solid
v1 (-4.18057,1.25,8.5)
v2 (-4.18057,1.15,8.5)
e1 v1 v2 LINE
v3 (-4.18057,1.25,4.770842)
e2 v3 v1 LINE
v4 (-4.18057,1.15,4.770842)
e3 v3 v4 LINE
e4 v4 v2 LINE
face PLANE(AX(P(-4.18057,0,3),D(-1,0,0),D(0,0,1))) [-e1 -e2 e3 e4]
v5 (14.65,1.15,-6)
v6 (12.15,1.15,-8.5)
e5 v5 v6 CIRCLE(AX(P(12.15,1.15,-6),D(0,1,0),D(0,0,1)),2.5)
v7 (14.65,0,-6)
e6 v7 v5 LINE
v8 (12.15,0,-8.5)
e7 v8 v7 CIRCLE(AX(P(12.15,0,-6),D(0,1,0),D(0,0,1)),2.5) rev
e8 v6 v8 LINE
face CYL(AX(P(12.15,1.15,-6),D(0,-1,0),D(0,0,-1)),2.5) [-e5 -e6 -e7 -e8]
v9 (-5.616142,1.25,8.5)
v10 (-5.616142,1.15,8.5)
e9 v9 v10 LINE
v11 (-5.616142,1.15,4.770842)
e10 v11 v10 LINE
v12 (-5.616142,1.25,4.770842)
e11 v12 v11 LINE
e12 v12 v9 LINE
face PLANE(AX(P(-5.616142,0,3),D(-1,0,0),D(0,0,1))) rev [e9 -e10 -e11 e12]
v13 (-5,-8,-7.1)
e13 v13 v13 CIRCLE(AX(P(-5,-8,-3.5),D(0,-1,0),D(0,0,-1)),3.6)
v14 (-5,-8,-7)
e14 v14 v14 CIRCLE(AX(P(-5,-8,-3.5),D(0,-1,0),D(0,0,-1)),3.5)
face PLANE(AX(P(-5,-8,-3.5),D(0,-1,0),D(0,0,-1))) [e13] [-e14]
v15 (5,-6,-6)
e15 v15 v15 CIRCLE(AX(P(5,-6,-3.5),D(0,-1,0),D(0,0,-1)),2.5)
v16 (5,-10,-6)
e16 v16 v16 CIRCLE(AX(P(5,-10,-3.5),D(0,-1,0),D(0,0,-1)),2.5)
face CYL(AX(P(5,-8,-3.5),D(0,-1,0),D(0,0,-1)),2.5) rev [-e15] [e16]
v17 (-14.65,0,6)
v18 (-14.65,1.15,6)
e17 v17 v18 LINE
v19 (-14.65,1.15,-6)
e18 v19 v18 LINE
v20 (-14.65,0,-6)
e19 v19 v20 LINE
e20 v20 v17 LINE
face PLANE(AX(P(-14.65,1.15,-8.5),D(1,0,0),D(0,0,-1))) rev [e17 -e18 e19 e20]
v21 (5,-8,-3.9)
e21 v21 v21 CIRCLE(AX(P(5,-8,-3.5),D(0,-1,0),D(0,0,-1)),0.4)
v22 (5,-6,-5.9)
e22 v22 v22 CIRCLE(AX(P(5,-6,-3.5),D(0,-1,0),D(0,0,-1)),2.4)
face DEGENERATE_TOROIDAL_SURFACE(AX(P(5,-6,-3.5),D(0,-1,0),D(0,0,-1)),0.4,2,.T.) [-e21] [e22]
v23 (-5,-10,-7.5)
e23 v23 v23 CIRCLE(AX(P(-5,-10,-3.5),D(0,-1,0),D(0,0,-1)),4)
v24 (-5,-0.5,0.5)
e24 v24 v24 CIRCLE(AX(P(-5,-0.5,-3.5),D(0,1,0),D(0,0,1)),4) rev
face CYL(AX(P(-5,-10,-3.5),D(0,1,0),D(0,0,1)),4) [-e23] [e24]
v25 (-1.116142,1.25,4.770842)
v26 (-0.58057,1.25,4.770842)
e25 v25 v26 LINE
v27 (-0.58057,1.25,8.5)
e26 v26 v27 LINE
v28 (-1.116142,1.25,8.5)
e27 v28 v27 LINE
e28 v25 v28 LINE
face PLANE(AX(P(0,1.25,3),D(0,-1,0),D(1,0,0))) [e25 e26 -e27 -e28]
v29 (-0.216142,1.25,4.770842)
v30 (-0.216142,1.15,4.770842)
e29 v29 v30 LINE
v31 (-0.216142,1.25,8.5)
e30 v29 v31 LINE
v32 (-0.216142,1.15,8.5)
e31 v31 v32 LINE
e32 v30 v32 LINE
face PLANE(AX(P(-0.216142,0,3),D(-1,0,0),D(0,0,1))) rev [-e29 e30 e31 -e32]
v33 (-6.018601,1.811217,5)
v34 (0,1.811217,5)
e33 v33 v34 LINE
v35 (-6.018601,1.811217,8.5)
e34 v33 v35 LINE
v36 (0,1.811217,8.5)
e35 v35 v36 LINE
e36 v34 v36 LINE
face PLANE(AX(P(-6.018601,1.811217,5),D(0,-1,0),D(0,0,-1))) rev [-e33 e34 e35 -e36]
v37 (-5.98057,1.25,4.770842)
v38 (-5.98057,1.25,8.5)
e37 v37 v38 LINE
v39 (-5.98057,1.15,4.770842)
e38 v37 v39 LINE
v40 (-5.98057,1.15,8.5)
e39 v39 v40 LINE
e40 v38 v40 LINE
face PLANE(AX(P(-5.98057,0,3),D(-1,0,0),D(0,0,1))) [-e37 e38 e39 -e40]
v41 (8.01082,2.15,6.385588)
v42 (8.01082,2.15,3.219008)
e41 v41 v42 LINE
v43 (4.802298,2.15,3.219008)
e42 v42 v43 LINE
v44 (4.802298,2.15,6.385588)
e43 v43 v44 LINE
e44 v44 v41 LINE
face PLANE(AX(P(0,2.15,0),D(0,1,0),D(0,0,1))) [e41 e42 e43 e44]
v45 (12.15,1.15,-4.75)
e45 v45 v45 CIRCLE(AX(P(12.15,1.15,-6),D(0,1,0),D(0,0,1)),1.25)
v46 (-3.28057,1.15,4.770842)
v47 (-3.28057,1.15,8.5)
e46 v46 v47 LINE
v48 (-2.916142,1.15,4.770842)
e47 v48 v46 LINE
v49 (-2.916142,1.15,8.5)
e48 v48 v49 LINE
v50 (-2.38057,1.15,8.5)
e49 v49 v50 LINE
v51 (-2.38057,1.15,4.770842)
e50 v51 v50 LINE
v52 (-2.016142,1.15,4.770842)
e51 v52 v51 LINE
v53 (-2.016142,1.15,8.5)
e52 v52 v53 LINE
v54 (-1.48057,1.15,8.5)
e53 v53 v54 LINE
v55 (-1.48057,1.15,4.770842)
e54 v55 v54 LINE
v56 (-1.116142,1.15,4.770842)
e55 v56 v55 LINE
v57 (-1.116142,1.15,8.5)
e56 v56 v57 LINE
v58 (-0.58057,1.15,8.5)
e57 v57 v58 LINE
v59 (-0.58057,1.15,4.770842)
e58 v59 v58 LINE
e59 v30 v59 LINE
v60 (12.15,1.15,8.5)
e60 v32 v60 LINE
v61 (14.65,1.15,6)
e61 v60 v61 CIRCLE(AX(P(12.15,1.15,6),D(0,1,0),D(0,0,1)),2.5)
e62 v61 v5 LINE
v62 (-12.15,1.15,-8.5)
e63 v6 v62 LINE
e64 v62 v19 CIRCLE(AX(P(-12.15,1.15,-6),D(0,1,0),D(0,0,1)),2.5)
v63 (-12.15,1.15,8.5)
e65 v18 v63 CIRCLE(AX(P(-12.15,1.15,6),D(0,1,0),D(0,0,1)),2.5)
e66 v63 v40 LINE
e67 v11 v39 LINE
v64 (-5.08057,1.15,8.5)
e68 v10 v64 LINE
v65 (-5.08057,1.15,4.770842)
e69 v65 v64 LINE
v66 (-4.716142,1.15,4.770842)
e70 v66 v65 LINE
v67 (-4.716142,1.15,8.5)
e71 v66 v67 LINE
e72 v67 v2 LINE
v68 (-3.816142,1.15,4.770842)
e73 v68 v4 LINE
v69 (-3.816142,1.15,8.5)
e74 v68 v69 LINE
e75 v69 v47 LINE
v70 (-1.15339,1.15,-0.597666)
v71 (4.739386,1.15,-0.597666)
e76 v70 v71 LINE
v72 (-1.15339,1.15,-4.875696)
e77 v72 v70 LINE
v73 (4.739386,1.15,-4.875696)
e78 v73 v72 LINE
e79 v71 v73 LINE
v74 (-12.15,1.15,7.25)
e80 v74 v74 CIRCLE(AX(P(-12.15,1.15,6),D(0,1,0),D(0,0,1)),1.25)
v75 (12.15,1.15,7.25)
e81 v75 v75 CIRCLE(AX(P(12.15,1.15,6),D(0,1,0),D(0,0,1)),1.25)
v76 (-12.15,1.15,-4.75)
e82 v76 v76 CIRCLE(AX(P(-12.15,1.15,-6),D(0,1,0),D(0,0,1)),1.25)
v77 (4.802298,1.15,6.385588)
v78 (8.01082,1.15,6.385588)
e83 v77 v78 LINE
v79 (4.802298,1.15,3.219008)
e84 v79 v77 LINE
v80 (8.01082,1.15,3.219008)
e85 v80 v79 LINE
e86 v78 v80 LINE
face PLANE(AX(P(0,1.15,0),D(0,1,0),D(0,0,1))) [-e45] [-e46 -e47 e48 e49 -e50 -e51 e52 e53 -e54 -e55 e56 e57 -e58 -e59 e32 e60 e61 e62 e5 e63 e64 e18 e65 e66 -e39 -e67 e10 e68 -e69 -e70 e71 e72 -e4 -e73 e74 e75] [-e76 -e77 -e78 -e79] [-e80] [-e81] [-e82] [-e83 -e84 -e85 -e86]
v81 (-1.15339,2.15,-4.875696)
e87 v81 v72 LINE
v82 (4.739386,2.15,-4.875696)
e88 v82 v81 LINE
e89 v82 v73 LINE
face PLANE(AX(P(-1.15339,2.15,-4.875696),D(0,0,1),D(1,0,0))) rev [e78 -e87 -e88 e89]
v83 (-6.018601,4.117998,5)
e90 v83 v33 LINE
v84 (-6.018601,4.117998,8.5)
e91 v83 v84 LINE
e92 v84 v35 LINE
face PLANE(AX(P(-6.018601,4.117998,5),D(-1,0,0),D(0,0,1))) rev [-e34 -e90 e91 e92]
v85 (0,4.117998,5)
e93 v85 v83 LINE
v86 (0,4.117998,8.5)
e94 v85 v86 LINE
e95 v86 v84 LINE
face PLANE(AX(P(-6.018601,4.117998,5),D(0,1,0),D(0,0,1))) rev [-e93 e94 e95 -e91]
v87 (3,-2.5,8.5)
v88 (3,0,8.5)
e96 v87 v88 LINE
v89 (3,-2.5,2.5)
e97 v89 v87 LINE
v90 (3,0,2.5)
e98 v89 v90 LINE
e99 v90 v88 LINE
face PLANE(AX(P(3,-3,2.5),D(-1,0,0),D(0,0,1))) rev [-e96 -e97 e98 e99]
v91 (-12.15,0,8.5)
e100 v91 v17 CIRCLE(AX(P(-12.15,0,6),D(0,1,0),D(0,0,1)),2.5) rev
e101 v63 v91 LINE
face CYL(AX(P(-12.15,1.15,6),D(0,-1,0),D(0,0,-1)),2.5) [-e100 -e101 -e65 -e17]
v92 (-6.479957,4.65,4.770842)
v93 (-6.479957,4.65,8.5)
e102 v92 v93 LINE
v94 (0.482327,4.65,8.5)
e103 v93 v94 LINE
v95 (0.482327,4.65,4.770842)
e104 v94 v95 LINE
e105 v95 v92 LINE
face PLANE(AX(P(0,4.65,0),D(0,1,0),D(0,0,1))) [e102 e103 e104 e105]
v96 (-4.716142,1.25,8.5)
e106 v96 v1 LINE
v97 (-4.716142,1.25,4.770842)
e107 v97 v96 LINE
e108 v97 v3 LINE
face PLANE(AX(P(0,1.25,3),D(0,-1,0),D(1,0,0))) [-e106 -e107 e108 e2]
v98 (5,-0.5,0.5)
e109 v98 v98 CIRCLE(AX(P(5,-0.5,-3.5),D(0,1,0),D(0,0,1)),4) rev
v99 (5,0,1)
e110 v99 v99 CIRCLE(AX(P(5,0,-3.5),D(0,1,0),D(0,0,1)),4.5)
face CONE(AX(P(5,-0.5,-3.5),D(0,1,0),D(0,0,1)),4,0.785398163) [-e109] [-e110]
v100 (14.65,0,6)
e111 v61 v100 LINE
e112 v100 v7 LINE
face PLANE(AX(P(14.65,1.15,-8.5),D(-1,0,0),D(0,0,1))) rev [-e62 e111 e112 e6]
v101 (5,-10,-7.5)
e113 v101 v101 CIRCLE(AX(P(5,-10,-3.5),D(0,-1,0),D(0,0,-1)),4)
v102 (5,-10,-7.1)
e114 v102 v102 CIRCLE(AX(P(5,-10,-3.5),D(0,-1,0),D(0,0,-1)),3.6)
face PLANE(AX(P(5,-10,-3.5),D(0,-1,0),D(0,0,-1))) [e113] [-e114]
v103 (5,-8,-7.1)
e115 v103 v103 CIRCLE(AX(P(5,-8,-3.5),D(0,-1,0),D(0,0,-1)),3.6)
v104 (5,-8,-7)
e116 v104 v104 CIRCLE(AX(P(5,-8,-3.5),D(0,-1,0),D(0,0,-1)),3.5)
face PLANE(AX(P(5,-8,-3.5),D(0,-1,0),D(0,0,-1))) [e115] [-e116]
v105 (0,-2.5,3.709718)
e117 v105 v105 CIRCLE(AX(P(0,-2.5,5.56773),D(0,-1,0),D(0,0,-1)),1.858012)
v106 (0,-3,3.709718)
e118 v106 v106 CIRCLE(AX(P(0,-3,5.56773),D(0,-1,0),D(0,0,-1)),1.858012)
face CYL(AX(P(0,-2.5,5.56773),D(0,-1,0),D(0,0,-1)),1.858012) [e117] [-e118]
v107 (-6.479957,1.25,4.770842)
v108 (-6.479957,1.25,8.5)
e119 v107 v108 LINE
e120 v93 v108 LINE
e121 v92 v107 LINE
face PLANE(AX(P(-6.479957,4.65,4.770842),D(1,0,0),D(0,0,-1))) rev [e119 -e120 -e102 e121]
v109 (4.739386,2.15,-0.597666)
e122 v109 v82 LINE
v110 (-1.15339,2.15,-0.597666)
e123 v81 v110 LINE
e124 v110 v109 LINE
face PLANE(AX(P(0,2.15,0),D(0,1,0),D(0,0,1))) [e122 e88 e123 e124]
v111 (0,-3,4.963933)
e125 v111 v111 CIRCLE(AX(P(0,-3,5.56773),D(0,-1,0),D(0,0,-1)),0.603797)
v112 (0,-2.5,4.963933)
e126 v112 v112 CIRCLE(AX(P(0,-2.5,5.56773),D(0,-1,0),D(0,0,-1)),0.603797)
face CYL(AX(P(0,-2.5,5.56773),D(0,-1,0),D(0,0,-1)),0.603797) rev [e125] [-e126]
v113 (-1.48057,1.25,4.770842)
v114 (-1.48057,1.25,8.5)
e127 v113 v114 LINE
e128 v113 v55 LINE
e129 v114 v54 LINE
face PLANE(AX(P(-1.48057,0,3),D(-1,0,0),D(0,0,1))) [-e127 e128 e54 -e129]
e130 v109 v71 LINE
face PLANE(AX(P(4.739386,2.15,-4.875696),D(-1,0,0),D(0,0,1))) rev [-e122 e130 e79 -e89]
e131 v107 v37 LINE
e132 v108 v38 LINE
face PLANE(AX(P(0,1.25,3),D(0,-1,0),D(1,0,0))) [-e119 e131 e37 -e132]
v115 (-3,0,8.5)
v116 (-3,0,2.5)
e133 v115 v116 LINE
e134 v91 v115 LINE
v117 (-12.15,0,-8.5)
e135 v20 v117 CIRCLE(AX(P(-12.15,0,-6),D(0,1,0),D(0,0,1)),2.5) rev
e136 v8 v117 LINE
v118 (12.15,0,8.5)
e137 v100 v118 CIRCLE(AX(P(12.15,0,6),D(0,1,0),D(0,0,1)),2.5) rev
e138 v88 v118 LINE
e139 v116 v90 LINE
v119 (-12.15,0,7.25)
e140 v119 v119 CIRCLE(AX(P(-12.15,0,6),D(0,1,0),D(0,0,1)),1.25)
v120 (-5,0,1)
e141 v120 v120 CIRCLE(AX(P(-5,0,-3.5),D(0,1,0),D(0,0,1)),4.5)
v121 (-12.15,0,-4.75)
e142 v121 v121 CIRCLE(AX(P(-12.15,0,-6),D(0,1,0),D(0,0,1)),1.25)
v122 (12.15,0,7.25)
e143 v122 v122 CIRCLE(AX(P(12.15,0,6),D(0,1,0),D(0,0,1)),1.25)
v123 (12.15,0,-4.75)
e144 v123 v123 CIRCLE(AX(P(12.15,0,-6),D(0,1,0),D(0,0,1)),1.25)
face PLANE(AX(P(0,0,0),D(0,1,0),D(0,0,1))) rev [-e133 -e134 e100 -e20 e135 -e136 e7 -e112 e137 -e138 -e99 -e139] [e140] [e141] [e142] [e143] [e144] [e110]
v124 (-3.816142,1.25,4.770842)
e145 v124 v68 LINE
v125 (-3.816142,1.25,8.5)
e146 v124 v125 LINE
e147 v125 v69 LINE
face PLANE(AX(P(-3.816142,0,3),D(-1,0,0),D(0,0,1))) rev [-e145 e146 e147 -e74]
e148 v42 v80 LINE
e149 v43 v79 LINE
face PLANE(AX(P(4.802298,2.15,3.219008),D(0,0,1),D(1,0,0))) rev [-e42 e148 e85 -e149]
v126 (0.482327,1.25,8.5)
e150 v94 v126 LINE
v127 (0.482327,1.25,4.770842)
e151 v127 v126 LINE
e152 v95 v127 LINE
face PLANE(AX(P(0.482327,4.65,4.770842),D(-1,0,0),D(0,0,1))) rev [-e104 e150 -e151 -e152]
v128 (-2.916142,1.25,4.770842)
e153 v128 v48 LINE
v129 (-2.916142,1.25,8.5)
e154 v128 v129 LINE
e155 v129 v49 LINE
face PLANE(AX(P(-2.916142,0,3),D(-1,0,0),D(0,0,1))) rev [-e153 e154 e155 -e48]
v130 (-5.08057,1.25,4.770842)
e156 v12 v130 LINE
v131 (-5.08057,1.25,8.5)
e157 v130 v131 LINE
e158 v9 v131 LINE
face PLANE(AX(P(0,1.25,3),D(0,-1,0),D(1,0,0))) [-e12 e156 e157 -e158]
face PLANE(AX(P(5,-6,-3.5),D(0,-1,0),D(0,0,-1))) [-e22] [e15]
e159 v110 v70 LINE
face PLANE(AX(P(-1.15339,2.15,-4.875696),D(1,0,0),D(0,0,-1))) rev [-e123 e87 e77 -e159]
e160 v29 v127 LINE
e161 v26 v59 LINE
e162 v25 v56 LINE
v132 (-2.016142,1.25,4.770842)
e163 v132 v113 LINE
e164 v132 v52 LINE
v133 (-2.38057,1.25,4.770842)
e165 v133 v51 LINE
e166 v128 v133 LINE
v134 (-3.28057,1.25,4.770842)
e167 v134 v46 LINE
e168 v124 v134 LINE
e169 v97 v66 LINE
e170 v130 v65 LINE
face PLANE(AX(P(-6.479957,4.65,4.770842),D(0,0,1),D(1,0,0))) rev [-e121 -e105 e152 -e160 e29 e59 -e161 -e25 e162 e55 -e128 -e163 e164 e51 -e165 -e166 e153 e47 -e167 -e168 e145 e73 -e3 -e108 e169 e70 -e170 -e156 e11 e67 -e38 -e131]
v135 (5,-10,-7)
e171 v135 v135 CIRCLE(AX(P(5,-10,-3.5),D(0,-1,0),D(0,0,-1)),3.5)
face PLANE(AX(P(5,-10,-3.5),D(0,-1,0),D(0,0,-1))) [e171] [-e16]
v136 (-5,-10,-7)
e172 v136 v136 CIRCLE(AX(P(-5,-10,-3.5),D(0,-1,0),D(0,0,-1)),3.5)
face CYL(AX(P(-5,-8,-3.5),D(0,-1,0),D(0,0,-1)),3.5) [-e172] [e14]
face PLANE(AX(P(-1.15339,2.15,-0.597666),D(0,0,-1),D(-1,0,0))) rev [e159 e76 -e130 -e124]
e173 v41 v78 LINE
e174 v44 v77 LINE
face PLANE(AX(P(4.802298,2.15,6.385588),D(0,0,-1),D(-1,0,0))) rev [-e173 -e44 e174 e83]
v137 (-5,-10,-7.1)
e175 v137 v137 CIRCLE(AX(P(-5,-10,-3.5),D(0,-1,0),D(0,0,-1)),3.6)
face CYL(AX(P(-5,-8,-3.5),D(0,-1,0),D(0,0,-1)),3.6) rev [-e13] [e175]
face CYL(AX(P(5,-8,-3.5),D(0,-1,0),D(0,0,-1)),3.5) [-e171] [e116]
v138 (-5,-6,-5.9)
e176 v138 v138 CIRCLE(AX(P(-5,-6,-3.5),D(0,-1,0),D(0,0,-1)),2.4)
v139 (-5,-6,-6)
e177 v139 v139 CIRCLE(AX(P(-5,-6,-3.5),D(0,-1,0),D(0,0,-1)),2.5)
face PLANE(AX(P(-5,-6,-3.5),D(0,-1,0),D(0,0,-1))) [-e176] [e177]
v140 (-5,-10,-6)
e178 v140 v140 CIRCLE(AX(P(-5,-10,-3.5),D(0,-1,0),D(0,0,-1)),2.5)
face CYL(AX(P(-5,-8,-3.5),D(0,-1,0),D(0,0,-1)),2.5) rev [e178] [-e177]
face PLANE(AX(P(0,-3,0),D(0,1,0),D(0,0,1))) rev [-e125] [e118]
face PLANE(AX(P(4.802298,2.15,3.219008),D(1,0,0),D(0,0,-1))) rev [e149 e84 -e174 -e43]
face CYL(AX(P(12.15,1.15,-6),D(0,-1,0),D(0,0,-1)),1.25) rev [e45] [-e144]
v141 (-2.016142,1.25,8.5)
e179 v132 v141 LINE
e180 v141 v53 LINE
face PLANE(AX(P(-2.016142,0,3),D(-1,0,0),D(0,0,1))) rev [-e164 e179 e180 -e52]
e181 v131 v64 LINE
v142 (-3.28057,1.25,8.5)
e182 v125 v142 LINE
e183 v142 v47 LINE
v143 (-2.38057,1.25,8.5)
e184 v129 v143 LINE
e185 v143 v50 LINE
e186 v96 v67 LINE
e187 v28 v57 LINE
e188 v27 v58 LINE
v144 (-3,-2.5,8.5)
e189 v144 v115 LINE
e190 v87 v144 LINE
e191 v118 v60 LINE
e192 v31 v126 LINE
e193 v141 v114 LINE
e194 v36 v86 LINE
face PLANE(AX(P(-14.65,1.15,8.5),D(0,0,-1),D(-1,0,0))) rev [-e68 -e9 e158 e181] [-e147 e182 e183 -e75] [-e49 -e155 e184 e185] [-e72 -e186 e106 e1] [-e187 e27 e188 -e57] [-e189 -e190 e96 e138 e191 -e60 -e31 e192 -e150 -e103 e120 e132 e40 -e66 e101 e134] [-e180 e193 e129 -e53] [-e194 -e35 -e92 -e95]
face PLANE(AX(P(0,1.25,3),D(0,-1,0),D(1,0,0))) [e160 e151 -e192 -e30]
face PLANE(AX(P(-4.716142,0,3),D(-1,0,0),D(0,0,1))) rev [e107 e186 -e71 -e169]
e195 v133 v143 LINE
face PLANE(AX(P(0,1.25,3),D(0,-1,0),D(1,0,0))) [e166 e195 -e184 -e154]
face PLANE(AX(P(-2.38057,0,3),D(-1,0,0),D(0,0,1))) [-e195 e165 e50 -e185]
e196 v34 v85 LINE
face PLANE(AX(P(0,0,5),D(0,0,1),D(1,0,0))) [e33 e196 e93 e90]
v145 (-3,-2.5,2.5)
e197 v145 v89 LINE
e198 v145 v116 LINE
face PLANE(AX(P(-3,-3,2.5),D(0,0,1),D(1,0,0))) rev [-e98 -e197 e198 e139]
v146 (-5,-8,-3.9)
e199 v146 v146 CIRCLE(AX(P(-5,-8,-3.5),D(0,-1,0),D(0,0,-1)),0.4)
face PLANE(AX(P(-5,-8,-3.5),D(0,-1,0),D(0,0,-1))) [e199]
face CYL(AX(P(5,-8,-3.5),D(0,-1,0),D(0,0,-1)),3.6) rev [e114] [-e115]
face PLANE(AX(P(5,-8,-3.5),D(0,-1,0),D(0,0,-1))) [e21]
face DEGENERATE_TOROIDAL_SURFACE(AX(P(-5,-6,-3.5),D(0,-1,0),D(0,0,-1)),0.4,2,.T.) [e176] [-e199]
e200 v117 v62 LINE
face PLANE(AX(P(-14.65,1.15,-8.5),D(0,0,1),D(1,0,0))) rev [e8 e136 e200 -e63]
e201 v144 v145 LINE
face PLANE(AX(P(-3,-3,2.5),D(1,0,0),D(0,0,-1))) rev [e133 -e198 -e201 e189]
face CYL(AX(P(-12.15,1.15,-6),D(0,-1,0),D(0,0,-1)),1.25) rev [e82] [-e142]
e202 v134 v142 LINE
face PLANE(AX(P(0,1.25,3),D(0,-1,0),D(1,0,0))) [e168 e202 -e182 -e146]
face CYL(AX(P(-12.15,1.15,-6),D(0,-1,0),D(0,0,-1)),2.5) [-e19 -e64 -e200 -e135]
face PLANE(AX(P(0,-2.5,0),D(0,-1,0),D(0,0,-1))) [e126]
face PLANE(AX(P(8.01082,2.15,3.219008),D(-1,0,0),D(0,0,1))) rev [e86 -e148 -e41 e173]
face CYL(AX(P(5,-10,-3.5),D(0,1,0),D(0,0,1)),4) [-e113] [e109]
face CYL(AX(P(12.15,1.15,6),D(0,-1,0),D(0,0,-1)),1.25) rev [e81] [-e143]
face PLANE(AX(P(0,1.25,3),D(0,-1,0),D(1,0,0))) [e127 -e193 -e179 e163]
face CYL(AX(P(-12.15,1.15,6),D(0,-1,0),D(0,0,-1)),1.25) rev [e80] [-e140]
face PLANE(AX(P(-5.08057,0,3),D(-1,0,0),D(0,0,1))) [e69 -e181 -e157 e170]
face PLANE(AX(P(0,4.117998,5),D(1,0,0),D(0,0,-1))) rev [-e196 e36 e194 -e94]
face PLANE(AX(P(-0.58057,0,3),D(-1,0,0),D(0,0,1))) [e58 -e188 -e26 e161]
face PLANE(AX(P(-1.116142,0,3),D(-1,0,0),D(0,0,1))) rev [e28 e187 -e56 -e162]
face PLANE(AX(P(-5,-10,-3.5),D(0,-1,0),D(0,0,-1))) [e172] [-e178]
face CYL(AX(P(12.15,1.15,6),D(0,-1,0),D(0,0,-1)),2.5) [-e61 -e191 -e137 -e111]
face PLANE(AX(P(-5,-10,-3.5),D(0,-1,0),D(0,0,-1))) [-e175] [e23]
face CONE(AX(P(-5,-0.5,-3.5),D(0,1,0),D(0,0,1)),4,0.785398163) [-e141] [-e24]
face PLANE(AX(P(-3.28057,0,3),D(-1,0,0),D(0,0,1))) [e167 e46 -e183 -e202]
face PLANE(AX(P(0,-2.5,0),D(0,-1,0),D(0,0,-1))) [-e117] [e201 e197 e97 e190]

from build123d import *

# Parameters (mm, degrees)
SKETCH1_W           = 29.3
SKETCH1_H           = 17
SKETCH1_R           = 1.25
BOSS_EXTRUDE1_DEPTH = 1.15
FILLET1_R           = 2.5
SKETCH2_W           = 6.962283529
SKETCH2_H           = 3.729158124
BOSS_EXTRUDE2_DEPTH = 3.5
SKETCH3_W           = 0.499386372
SKETCH3_H           = 0.1
SKETCH3_W_2         = 0.535571303
SKETCH3_W_3         = 0.69846846
CUT_EXTRUDE1_DEPTH  = 5.5
SKETCH4_W           = 6.01860052
SKETCH4_H           = 2.306780687
CUT_EXTRUDE2_DEPTH  = 3.5
SKETCH5_W           = 5.89277612
SKETCH5_H           = 4.278029639
BOSS_EXTRUDE3_DEPTH = 1
SKETCH6_W           = 3.208522229
SKETCH6_H           = 3.166580762
BOSS_EXTRUDE4_DEPTH = 1
SKETCH7_W           = 6
SKETCH7_H           = 6
BOSS_EXTRUDE5_DEPTH = 3
SKETCH8_W           = 6
SKETCH8_H           = 6
SKETCH8_R           = 1.858011724
SKETCH8_R_2         = 0.603796911
CUT_EXTRUDE3_DEPTH  = 0.5
SKETCH10_R          = 4
BOSS_EXTRUDE6_DEPTH = 10
SKETCH11_R          = 2.5
CUT_EXTRUDE4_DEPTH  = 2
SKETCH12_R          = 2.5
SKETCH12_R_2        = 2.4
CUT_EXTRUDE5_DEPTH  = 2
FILLET2_R           = 2
SKETCH13_R          = 2.5
SKETCH13_R_2        = 2.4
CUT_EXTRUDE6_DEPTH  = 2
FILLET3_R           = 2
CHAMFER1_SIZE       = 0.5
SKETCH14_R          = 3.6
SKETCH14_R_2        = 3.5
CUT_EXTRUDE7_DEPTH  = 2


with BuildPart() as part:
    # Sketch1 → Boss-Extrude1 (new body)
    with BuildSketch(Plane(origin=(0, 0, 0), x_dir=(1, 0, 0), z_dir=(0, 1, 0))):
        Rectangle(SKETCH1_W, SKETCH1_H)
        with Locations(Location((-12.15, 6, 0), (0, 0, 270))):
            Circle(SKETCH1_R, mode=Mode.SUBTRACT)
        with Locations(Location((-12.15, -6, 0), (0, 0, 270))):
            Circle(SKETCH1_R, mode=Mode.SUBTRACT)
        with Locations(Location((12.15, -6, 0), (0, 0, 270))):
            Circle(SKETCH1_R, mode=Mode.SUBTRACT)
        with Locations(Location((12.15, 6, 0), (0, 0, 270))):
            Circle(SKETCH1_R, mode=Mode.SUBTRACT)
    extrude(amount=BOSS_EXTRUDE1_DEPTH)

    # Fillet1
    fillet1_edges = [part.edges().sort_by_distance(p)[0] for p in [
        (14.65, 0.575, 8.5),
        (-14.65, 0.575, 8.5),
        (-14.65, 0.575, -8.5),
        (14.65, 0.575, -8.5),
    ]]
    fillet(fillet1_edges, radius=FILLET1_R)

    # Sketch2 → Boss-Extrude2 (add)
    with BuildSketch(Plane(origin=(0, 1.15, 0), x_dir=(1, 0, 0), z_dir=(0, 1, 0))):
        with Locations((-2.998814894, -6.635420938)):
            Rectangle(SKETCH2_W, SKETCH2_H)
    extrude(amount=BOSS_EXTRUDE2_DEPTH)

    # Sketch3 → Cut-Extrude1 (cut)
    with BuildSketch(Plane.XY.offset(8.5)):
        with Locations((-6.230263472, 1.2)):
            Rectangle(SKETCH3_W, SKETCH3_H)
        with Locations((-5.348355938, 1.2)):
            Rectangle(SKETCH3_W_2, SKETCH3_H)
        with Locations((-4.448355938, 1.2)):
            Rectangle(SKETCH3_W_2, SKETCH3_H)
        with Locations((-3.548355938, 1.2)):
            Rectangle(SKETCH3_W_2, SKETCH3_H)
        with Locations((-2.648355937, 1.2)):
            Rectangle(SKETCH3_W_2, SKETCH3_H)
        with Locations((-1.748355937, 1.2)):
            Rectangle(SKETCH3_W_2, SKETCH3_H)
        with Locations((-0.848355938, 1.2)):
            Rectangle(SKETCH3_W_2, SKETCH3_H)
        with Locations((0.133092641, 1.2)):
            Rectangle(SKETCH3_W_3, SKETCH3_H)
    extrude(amount=-CUT_EXTRUDE1_DEPTH, mode=Mode.SUBTRACT)

    # Sketch4 → Cut-Extrude2 (cut)
    with BuildSketch(Plane.XY.offset(8.5)):
        with Locations((-3.00930026, 2.964607373)):
            Rectangle(SKETCH4_W, SKETCH4_H)
    extrude(amount=-CUT_EXTRUDE2_DEPTH, mode=Mode.SUBTRACT)

    # Sketch5 → Boss-Extrude3 (add)
    with BuildSketch(Plane(origin=(0, 1.15, 0), x_dir=(1, 0, 0), z_dir=(0, 1, 0))):
        with Locations((1.792997716, 2.736680725)):
            Rectangle(SKETCH5_W, SKETCH5_H)
    extrude(amount=BOSS_EXTRUDE3_DEPTH)

    # Sketch6 → Boss-Extrude4 (add)
    with BuildSketch(Plane(origin=(0, 1.15, 0), x_dir=(1, 0, 0), z_dir=(0, 1, 0))):
        with Locations((6.406559091, -4.802297976)):
            Rectangle(SKETCH6_W, SKETCH6_H)
    extrude(amount=BOSS_EXTRUDE4_DEPTH)

    # Sketch7 → Boss-Extrude5 (add)
    with BuildSketch(Plane.XZ):
        with Locations((0, 5.5)):
            Rectangle(SKETCH7_W, SKETCH7_H)
    extrude(amount=BOSS_EXTRUDE5_DEPTH)

    # Sketch8 → Cut-Extrude3 (cut)
    # profile 1 of 2: a face of its own
    with BuildSketch(Plane.XZ.offset(3)):
        with Locations((0, 5.5)):
            Rectangle(SKETCH8_W, SKETCH8_H)
        with Locations(Location((0, 5.56772975, 0), (0, 0, 270))):
            Circle(SKETCH8_R, mode=Mode.SUBTRACT)
    # profile 2 of 2: a face of its own
    with BuildSketch(Plane.XZ.offset(3)):
        with Locations(Location((0, 5.56772975, 0), (0, 0, 270))):
            Circle(SKETCH8_R_2)
    extrude(amount=-CUT_EXTRUDE3_DEPTH, mode=Mode.SUBTRACT)

    # Sketch10 → Boss-Extrude6 (add)
    with BuildSketch(Plane.XZ):
        with Locations(Location((5, -3.5, 0), (0, 0, 90))):
            Circle(SKETCH10_R)
        with Locations(Location((-5, -3.5, 0), (0, 0, 90))):
            Circle(SKETCH10_R)
    extrude(amount=BOSS_EXTRUDE6_DEPTH)

    # Sketch11 → Cut-Extrude4 (cut)
    with BuildSketch(Plane.XZ.offset(10)):
        with Locations(Location((-5, -3.5, 0), (0, 0, 270))):
            Circle(SKETCH11_R)
        with Locations(Location((5, -3.5, 0), (0, 0, 270))):
            Circle(SKETCH11_R)
    extrude(amount=-CUT_EXTRUDE4_DEPTH, mode=Mode.SUBTRACT)

    # Sketch12 → Cut-Extrude5 (cut)
    with BuildSketch(Plane.XZ.offset(8)):
        with Locations(Location((-5, -3.5, 0), (0, 0, 270))):
            Circle(SKETCH12_R)
        with Locations(Location((-5, -3.5, 0), (0, 0, 270))):
            Circle(SKETCH12_R_2, mode=Mode.SUBTRACT)
    extrude(amount=-CUT_EXTRUDE5_DEPTH, mode=Mode.SUBTRACT)

    # Fillet2
    fillet2_edges = [part.edges().sort_by_distance(p)[0] for p in [
        (-5, -8, -1.1),
    ]]
    fillet(fillet2_edges, radius=FILLET2_R - 0.0001)  # a hair under: the kernel refuses the full size

    # Sketch13 → Cut-Extrude6 (cut)
    with BuildSketch(Plane.XZ.offset(8)):
        with Locations(Location((5, -3.5, 0), (0, 0, 270))):
            Circle(SKETCH13_R)
        with Locations(Location((5, -3.5, 0), (0, 0, 270))):
            Circle(SKETCH13_R_2, mode=Mode.SUBTRACT)
    extrude(amount=-CUT_EXTRUDE6_DEPTH, mode=Mode.SUBTRACT)

    # Fillet3
    fillet3_edges = [part.edges().sort_by_distance(p)[0] for p in [
        (5, -8, -1.1),
    ]]
    fillet(fillet3_edges, radius=FILLET3_R - 0.0001)  # a hair under: the kernel refuses the full size

    # Chamfer1
    chamfer1_edges = [part.edges().sort_by_distance(p)[0] for p in [
        (5, 0, -7.5),
        (-5, 0, -7.5),
    ]]
    chamfer(chamfer1_edges, length=CHAMFER1_SIZE)

    # Sketch14 → Cut-Extrude7 (cut)
    # profile 1 of 2: a face of its own
    with BuildSketch(Plane.XZ.offset(10)):
        with Locations(Location((-5, -3.5, 0), (0, 0, 270))):
            Circle(SKETCH14_R)
        with Locations(Location((-5, -3.5, 0), (0, 0, 270))):
            Circle(SKETCH14_R_2, mode=Mode.SUBTRACT)
    # profile 2 of 2: a face of its own
    with BuildSketch(Plane.XZ.offset(10)):
        with Locations(Location((5, -3.5, 0), (0, 0, 270))):
            Circle(SKETCH14_R)
        with Locations(Location((5, -3.5, 0), (0, 0, 270))):
            Circle(SKETCH14_R_2, mode=Mode.SUBTRACT)
    extrude(amount=-CUT_EXTRUDE7_DEPTH, mode=Mode.SUBTRACT)


solid = part.part
